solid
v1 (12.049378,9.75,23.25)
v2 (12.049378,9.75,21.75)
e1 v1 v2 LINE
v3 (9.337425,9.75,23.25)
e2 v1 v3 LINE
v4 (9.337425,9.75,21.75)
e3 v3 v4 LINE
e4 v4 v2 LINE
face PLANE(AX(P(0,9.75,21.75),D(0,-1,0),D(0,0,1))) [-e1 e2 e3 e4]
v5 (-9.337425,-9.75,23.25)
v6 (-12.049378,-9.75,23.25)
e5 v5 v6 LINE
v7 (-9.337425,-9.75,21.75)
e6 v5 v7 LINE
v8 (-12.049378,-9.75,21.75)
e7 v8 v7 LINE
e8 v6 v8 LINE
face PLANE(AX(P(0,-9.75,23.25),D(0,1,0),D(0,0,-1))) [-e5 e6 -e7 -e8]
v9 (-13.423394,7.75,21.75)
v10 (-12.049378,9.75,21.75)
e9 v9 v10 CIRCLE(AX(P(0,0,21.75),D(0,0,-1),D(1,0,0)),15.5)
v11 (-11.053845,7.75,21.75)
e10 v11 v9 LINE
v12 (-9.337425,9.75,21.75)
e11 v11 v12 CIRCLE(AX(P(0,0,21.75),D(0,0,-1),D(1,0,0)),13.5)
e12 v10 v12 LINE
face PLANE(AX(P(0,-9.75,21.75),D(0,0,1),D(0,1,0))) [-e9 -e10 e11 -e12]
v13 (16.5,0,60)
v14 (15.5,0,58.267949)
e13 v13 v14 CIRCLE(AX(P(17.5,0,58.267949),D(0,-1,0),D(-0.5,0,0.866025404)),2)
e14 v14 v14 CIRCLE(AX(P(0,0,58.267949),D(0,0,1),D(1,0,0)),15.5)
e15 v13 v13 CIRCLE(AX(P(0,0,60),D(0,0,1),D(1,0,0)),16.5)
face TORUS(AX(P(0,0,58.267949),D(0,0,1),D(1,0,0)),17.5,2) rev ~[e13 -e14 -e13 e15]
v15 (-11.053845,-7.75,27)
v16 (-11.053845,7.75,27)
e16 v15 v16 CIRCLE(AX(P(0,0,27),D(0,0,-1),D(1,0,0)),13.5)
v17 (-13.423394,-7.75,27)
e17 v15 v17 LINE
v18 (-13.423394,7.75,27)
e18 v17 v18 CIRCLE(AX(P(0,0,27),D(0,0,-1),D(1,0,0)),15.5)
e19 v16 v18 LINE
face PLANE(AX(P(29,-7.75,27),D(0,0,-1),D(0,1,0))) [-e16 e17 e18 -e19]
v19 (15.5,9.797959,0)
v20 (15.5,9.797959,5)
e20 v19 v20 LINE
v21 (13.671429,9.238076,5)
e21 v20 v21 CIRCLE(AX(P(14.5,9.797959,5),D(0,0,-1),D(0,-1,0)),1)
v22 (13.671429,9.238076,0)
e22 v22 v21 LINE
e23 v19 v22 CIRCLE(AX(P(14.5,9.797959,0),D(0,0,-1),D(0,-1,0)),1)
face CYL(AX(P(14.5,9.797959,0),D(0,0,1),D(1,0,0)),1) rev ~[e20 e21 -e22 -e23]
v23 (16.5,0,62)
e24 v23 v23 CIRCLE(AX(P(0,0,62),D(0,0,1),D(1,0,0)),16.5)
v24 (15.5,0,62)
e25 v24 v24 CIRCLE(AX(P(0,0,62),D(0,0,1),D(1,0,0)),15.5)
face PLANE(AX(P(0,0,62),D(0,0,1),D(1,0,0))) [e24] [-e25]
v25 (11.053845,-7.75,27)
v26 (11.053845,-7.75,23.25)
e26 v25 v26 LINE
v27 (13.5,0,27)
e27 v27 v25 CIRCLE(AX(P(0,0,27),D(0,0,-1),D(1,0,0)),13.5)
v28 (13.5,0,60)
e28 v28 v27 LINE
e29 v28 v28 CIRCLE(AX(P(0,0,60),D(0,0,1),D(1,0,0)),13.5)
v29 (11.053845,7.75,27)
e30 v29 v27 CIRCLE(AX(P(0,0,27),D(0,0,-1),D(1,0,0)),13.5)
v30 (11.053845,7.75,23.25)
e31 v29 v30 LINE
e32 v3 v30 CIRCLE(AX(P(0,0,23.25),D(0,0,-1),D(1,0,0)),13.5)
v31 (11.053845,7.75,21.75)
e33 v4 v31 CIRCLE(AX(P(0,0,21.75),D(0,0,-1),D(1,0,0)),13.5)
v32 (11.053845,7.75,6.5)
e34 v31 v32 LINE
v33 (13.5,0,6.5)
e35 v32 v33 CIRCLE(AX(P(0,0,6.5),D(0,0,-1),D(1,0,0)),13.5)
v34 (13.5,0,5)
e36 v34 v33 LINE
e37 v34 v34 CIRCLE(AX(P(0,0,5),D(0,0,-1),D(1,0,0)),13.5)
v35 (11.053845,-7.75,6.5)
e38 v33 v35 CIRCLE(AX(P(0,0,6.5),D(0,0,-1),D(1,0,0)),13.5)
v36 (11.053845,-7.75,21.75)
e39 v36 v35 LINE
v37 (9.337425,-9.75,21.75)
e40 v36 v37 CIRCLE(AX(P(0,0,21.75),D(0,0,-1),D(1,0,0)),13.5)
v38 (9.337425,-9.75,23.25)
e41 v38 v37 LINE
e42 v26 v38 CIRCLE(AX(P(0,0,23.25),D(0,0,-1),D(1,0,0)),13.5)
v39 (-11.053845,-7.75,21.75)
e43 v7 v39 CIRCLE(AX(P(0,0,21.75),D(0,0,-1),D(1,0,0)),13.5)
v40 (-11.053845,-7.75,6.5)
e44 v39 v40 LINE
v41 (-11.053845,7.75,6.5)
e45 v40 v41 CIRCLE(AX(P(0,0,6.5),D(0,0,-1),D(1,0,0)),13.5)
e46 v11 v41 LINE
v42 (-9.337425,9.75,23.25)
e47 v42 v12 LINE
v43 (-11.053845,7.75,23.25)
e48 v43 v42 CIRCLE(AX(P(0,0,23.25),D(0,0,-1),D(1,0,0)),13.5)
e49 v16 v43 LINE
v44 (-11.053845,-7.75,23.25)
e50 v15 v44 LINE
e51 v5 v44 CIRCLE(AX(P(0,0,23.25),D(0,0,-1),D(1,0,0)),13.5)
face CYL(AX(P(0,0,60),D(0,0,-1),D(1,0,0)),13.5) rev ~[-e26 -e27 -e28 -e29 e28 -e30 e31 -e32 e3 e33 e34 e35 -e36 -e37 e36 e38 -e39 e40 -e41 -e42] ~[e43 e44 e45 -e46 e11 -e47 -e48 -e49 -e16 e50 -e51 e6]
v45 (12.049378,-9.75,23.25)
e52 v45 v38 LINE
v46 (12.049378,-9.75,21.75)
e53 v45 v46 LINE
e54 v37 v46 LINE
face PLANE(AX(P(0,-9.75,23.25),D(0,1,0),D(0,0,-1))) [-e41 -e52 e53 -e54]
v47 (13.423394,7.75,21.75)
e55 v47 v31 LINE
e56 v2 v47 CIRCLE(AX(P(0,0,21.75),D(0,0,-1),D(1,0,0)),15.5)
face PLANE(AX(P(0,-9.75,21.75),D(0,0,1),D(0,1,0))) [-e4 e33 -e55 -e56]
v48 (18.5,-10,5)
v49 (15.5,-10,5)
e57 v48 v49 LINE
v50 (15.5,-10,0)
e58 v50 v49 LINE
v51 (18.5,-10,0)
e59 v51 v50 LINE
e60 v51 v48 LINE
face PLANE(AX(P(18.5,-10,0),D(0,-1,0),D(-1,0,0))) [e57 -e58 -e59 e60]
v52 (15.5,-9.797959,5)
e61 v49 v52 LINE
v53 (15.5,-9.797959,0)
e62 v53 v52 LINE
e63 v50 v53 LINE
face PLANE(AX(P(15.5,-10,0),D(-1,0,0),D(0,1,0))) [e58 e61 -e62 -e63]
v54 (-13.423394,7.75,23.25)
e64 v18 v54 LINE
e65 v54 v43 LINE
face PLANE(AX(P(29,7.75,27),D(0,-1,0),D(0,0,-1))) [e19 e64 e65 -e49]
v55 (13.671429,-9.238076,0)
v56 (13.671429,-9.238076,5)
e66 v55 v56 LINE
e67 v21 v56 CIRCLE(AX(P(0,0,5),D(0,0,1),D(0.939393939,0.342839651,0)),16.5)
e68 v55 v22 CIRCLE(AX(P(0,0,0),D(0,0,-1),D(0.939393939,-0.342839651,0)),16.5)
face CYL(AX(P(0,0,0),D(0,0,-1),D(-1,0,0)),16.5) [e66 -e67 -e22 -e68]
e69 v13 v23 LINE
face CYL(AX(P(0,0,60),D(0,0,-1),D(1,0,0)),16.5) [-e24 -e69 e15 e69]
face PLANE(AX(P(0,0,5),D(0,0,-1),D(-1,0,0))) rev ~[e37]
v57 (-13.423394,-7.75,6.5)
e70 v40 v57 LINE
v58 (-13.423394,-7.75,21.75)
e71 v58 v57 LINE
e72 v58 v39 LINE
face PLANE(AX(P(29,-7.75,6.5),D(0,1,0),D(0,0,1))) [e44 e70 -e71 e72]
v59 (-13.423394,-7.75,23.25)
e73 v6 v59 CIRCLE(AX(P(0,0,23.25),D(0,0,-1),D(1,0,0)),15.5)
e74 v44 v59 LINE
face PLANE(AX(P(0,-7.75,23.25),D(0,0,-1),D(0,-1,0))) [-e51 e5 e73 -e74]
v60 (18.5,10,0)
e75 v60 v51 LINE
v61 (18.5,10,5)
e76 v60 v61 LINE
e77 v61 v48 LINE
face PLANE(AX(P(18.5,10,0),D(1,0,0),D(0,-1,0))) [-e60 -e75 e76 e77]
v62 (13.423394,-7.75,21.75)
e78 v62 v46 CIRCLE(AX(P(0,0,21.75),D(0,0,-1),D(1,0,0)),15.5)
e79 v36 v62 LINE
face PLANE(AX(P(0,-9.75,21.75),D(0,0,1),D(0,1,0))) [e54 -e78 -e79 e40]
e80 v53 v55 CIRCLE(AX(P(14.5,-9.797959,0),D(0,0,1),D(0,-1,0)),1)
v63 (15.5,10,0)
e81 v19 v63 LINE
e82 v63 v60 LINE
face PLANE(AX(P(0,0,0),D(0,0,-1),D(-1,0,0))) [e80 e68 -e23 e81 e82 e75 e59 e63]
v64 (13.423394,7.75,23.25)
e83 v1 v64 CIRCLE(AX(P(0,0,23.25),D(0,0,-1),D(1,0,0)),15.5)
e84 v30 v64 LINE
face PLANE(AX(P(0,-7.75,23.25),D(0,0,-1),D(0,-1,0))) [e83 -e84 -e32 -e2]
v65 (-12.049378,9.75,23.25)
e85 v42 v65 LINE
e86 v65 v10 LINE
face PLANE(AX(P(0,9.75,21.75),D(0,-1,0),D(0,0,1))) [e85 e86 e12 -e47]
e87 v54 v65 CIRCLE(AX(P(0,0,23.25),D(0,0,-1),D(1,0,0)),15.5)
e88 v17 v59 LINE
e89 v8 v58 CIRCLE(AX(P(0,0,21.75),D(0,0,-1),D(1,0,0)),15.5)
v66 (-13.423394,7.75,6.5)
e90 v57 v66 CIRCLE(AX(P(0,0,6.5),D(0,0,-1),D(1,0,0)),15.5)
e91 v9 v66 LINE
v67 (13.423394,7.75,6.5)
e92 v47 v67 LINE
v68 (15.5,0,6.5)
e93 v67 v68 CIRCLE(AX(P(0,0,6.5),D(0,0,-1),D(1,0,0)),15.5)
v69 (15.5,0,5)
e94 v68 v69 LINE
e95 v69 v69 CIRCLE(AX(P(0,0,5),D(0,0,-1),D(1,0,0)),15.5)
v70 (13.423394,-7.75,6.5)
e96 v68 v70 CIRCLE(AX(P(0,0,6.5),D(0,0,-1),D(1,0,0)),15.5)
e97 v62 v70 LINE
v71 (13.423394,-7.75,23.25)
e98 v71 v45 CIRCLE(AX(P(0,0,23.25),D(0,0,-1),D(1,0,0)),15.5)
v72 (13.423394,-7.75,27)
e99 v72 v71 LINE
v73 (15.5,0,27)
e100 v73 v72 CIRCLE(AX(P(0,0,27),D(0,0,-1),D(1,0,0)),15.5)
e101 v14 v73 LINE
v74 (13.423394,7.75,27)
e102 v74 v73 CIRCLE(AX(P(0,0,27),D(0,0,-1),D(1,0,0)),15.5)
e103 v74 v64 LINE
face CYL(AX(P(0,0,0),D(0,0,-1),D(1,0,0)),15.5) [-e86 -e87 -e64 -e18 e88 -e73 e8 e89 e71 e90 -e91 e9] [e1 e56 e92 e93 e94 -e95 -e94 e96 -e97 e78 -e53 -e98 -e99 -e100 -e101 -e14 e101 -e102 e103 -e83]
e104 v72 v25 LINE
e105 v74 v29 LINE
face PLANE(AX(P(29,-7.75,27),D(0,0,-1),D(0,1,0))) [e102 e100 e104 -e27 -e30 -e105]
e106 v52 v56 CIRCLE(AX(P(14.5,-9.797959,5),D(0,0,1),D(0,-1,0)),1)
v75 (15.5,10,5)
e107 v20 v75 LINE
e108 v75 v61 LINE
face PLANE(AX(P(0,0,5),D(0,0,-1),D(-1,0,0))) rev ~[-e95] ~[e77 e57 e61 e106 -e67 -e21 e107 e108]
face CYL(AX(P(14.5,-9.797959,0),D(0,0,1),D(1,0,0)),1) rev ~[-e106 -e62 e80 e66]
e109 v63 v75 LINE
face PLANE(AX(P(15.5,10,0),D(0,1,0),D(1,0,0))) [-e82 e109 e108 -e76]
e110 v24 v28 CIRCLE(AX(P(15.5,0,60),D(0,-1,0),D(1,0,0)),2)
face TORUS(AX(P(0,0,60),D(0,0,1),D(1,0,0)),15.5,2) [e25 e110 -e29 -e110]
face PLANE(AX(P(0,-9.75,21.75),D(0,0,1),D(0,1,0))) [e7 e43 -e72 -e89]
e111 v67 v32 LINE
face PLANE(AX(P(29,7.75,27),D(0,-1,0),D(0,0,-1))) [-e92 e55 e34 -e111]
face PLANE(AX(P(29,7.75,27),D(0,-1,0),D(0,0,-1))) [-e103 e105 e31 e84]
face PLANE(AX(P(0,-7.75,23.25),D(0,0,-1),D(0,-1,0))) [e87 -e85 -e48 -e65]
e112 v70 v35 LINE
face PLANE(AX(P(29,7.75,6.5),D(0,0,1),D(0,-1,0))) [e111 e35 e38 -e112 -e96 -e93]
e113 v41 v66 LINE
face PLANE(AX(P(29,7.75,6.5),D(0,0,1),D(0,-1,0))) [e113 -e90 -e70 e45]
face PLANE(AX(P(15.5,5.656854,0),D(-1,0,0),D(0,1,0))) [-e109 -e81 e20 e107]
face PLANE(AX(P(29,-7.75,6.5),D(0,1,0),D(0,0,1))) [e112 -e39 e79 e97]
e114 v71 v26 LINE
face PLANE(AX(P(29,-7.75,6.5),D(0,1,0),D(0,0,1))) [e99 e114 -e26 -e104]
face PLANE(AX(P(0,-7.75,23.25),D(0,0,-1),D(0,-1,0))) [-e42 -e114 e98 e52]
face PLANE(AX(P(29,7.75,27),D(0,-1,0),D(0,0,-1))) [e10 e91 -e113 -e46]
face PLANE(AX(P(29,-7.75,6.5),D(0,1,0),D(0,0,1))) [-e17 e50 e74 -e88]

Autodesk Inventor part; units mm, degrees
ref_plane "XZ Plane" through (0, 0, 0) normal (0, 1, 0) x (-1, 0, 0)
ref_plane "XY Plane" through (0, 0, 0) normal (0, 0, 1) x (1, 0, 0)
sketch "Esboço1" plane through (0, 0, 0) normal (0, 0, 1) x (1, 0, 0)
  circle A0 centre (0, 0) radius 15.5
  dimension "d0" = 31
extrude "Extrusão1" add sketch "Esboço1" along normal blind 2
sketch "Esboço2" plane through (0, 0, 2) normal (0, 0, 1) x (1, 0, 0)
  circle A0 centre (0, 0) radius 15.5 projected
  circle A1 centre (0, 0) radius 13.5
  dimension "d3" = 2
extrude "Extrusão2" add sketch "Esboço2" along normal blind 58
ref_plane "Plano de trabalho4" through (29, 0, 0) normal (1, 0, 0) x (0, 1, 0)
sketch "Esboço5" plane through (29, 0, 0) normal (1, 0, 0) x (0, 1, 0)
  line L0 (-7.75, 27) -> (7.75, 27)
  line L1 (7.75, 27) -> (7.75, 6.5)
  line L2 (7.75, 6.5) -> (-7.75, 6.5)
  line L3 (-7.75, 6.5) -> (-7.75, 27)
  line L4 (-7.75, 27) -> (7.75, 6.5) construction
  line L5 (7.75, 27) -> (-7.75, 6.5) construction
  line L6 (15.5, 0) -> (-15.5, 0) projected
  point P0 (0, 0)
  point P1 (0, 16.75)
  dimension "d15" = 20.5
  dimension "d16" = 15.5
  dimension "d17" = 0
  dimension "d18" = 6.5
extrude "Extrusão4" cut sketch "Esboço5" against normal through all
sketch "Esboço7" plane through (0, 0, 60) normal (0, 0, 1) x (1, 0, 0)
  circle A0 centre (0, 0) radius 16.5
  circle A1 centre (0, 0) radius 13.5 projected
  dimension "d28" = 33
extrude "Extrusão6" add sketch "Esboço7" along normal blind 2
fillet "Arredondamento2" radius 2 1 edges at (-13.5, 0, 62)
fillet "Arredondamento3" radius 2 1 edges at (-15.5, 0, 60)
sketch "Sketch8" plane through (0, 0, 0) normal (1, 0, 0) x (0, 1, 0)
  line L0 (-9.75, 21.75) -> (9.75, 21.75)
  line L1 (9.75, 21.75) -> (9.75, 23.25)
  line L2 (9.75, 23.25) -> (-9.75, 23.25)
  line L3 (-9.75, 23.25) -> (-9.75, 21.75)
  line L4 (-7.75, 27) -> (7.75, 27) projected
  line L5 (7.75, 27) -> (7.75, 6.5) projected
  line L6 (-7.75, 6.5) -> (-7.75, 27) projected
  point P0 (0, 0)
  dimension "d37" = 3.75
  dimension "d38" = 1.5
  dimension "d39" = 2
  dimension "d40" = 2
extrude "Extrusion7" cut sketch "Sketch8" along normal mid plane 50 contours L3 L2 L6 L0 | L6 L2 L5 L0 | L5 L2 L1 L0
sketch "Sketch11" plane through (0, 0, 0) normal (0, 0, -1) x (-1, 0, 0)
  line L0 (-18.5, -10) -> (-15.5, -10)
  line L1 (-15.5, -10) -> (-15.5, 10)
  line L2 (-15.5, 10) -> (-18.5, 10)
  line L3 (-18.5, 10) -> (-18.5, -10)
  circle A0 centre (0, 0) radius 16.5 projected
  point P0 (-16.5, 0)
  point P1 (-15.5, 5.6569)
  point P2 (-15.5, -5.6569)
  dimension "d48" = 3
  dimension "d49" = 2
  dimension "d50" = 20
  dimension "d51" = 10
extrude "Extrusion9" add sketch "Sketch11" against normal blind 5
fillet "Fillet4" radius 1 2 edges at (15.5, 5.6569, 2.5) (15.5, -5.6569, 2.5)
properties part number "peca1v2"
